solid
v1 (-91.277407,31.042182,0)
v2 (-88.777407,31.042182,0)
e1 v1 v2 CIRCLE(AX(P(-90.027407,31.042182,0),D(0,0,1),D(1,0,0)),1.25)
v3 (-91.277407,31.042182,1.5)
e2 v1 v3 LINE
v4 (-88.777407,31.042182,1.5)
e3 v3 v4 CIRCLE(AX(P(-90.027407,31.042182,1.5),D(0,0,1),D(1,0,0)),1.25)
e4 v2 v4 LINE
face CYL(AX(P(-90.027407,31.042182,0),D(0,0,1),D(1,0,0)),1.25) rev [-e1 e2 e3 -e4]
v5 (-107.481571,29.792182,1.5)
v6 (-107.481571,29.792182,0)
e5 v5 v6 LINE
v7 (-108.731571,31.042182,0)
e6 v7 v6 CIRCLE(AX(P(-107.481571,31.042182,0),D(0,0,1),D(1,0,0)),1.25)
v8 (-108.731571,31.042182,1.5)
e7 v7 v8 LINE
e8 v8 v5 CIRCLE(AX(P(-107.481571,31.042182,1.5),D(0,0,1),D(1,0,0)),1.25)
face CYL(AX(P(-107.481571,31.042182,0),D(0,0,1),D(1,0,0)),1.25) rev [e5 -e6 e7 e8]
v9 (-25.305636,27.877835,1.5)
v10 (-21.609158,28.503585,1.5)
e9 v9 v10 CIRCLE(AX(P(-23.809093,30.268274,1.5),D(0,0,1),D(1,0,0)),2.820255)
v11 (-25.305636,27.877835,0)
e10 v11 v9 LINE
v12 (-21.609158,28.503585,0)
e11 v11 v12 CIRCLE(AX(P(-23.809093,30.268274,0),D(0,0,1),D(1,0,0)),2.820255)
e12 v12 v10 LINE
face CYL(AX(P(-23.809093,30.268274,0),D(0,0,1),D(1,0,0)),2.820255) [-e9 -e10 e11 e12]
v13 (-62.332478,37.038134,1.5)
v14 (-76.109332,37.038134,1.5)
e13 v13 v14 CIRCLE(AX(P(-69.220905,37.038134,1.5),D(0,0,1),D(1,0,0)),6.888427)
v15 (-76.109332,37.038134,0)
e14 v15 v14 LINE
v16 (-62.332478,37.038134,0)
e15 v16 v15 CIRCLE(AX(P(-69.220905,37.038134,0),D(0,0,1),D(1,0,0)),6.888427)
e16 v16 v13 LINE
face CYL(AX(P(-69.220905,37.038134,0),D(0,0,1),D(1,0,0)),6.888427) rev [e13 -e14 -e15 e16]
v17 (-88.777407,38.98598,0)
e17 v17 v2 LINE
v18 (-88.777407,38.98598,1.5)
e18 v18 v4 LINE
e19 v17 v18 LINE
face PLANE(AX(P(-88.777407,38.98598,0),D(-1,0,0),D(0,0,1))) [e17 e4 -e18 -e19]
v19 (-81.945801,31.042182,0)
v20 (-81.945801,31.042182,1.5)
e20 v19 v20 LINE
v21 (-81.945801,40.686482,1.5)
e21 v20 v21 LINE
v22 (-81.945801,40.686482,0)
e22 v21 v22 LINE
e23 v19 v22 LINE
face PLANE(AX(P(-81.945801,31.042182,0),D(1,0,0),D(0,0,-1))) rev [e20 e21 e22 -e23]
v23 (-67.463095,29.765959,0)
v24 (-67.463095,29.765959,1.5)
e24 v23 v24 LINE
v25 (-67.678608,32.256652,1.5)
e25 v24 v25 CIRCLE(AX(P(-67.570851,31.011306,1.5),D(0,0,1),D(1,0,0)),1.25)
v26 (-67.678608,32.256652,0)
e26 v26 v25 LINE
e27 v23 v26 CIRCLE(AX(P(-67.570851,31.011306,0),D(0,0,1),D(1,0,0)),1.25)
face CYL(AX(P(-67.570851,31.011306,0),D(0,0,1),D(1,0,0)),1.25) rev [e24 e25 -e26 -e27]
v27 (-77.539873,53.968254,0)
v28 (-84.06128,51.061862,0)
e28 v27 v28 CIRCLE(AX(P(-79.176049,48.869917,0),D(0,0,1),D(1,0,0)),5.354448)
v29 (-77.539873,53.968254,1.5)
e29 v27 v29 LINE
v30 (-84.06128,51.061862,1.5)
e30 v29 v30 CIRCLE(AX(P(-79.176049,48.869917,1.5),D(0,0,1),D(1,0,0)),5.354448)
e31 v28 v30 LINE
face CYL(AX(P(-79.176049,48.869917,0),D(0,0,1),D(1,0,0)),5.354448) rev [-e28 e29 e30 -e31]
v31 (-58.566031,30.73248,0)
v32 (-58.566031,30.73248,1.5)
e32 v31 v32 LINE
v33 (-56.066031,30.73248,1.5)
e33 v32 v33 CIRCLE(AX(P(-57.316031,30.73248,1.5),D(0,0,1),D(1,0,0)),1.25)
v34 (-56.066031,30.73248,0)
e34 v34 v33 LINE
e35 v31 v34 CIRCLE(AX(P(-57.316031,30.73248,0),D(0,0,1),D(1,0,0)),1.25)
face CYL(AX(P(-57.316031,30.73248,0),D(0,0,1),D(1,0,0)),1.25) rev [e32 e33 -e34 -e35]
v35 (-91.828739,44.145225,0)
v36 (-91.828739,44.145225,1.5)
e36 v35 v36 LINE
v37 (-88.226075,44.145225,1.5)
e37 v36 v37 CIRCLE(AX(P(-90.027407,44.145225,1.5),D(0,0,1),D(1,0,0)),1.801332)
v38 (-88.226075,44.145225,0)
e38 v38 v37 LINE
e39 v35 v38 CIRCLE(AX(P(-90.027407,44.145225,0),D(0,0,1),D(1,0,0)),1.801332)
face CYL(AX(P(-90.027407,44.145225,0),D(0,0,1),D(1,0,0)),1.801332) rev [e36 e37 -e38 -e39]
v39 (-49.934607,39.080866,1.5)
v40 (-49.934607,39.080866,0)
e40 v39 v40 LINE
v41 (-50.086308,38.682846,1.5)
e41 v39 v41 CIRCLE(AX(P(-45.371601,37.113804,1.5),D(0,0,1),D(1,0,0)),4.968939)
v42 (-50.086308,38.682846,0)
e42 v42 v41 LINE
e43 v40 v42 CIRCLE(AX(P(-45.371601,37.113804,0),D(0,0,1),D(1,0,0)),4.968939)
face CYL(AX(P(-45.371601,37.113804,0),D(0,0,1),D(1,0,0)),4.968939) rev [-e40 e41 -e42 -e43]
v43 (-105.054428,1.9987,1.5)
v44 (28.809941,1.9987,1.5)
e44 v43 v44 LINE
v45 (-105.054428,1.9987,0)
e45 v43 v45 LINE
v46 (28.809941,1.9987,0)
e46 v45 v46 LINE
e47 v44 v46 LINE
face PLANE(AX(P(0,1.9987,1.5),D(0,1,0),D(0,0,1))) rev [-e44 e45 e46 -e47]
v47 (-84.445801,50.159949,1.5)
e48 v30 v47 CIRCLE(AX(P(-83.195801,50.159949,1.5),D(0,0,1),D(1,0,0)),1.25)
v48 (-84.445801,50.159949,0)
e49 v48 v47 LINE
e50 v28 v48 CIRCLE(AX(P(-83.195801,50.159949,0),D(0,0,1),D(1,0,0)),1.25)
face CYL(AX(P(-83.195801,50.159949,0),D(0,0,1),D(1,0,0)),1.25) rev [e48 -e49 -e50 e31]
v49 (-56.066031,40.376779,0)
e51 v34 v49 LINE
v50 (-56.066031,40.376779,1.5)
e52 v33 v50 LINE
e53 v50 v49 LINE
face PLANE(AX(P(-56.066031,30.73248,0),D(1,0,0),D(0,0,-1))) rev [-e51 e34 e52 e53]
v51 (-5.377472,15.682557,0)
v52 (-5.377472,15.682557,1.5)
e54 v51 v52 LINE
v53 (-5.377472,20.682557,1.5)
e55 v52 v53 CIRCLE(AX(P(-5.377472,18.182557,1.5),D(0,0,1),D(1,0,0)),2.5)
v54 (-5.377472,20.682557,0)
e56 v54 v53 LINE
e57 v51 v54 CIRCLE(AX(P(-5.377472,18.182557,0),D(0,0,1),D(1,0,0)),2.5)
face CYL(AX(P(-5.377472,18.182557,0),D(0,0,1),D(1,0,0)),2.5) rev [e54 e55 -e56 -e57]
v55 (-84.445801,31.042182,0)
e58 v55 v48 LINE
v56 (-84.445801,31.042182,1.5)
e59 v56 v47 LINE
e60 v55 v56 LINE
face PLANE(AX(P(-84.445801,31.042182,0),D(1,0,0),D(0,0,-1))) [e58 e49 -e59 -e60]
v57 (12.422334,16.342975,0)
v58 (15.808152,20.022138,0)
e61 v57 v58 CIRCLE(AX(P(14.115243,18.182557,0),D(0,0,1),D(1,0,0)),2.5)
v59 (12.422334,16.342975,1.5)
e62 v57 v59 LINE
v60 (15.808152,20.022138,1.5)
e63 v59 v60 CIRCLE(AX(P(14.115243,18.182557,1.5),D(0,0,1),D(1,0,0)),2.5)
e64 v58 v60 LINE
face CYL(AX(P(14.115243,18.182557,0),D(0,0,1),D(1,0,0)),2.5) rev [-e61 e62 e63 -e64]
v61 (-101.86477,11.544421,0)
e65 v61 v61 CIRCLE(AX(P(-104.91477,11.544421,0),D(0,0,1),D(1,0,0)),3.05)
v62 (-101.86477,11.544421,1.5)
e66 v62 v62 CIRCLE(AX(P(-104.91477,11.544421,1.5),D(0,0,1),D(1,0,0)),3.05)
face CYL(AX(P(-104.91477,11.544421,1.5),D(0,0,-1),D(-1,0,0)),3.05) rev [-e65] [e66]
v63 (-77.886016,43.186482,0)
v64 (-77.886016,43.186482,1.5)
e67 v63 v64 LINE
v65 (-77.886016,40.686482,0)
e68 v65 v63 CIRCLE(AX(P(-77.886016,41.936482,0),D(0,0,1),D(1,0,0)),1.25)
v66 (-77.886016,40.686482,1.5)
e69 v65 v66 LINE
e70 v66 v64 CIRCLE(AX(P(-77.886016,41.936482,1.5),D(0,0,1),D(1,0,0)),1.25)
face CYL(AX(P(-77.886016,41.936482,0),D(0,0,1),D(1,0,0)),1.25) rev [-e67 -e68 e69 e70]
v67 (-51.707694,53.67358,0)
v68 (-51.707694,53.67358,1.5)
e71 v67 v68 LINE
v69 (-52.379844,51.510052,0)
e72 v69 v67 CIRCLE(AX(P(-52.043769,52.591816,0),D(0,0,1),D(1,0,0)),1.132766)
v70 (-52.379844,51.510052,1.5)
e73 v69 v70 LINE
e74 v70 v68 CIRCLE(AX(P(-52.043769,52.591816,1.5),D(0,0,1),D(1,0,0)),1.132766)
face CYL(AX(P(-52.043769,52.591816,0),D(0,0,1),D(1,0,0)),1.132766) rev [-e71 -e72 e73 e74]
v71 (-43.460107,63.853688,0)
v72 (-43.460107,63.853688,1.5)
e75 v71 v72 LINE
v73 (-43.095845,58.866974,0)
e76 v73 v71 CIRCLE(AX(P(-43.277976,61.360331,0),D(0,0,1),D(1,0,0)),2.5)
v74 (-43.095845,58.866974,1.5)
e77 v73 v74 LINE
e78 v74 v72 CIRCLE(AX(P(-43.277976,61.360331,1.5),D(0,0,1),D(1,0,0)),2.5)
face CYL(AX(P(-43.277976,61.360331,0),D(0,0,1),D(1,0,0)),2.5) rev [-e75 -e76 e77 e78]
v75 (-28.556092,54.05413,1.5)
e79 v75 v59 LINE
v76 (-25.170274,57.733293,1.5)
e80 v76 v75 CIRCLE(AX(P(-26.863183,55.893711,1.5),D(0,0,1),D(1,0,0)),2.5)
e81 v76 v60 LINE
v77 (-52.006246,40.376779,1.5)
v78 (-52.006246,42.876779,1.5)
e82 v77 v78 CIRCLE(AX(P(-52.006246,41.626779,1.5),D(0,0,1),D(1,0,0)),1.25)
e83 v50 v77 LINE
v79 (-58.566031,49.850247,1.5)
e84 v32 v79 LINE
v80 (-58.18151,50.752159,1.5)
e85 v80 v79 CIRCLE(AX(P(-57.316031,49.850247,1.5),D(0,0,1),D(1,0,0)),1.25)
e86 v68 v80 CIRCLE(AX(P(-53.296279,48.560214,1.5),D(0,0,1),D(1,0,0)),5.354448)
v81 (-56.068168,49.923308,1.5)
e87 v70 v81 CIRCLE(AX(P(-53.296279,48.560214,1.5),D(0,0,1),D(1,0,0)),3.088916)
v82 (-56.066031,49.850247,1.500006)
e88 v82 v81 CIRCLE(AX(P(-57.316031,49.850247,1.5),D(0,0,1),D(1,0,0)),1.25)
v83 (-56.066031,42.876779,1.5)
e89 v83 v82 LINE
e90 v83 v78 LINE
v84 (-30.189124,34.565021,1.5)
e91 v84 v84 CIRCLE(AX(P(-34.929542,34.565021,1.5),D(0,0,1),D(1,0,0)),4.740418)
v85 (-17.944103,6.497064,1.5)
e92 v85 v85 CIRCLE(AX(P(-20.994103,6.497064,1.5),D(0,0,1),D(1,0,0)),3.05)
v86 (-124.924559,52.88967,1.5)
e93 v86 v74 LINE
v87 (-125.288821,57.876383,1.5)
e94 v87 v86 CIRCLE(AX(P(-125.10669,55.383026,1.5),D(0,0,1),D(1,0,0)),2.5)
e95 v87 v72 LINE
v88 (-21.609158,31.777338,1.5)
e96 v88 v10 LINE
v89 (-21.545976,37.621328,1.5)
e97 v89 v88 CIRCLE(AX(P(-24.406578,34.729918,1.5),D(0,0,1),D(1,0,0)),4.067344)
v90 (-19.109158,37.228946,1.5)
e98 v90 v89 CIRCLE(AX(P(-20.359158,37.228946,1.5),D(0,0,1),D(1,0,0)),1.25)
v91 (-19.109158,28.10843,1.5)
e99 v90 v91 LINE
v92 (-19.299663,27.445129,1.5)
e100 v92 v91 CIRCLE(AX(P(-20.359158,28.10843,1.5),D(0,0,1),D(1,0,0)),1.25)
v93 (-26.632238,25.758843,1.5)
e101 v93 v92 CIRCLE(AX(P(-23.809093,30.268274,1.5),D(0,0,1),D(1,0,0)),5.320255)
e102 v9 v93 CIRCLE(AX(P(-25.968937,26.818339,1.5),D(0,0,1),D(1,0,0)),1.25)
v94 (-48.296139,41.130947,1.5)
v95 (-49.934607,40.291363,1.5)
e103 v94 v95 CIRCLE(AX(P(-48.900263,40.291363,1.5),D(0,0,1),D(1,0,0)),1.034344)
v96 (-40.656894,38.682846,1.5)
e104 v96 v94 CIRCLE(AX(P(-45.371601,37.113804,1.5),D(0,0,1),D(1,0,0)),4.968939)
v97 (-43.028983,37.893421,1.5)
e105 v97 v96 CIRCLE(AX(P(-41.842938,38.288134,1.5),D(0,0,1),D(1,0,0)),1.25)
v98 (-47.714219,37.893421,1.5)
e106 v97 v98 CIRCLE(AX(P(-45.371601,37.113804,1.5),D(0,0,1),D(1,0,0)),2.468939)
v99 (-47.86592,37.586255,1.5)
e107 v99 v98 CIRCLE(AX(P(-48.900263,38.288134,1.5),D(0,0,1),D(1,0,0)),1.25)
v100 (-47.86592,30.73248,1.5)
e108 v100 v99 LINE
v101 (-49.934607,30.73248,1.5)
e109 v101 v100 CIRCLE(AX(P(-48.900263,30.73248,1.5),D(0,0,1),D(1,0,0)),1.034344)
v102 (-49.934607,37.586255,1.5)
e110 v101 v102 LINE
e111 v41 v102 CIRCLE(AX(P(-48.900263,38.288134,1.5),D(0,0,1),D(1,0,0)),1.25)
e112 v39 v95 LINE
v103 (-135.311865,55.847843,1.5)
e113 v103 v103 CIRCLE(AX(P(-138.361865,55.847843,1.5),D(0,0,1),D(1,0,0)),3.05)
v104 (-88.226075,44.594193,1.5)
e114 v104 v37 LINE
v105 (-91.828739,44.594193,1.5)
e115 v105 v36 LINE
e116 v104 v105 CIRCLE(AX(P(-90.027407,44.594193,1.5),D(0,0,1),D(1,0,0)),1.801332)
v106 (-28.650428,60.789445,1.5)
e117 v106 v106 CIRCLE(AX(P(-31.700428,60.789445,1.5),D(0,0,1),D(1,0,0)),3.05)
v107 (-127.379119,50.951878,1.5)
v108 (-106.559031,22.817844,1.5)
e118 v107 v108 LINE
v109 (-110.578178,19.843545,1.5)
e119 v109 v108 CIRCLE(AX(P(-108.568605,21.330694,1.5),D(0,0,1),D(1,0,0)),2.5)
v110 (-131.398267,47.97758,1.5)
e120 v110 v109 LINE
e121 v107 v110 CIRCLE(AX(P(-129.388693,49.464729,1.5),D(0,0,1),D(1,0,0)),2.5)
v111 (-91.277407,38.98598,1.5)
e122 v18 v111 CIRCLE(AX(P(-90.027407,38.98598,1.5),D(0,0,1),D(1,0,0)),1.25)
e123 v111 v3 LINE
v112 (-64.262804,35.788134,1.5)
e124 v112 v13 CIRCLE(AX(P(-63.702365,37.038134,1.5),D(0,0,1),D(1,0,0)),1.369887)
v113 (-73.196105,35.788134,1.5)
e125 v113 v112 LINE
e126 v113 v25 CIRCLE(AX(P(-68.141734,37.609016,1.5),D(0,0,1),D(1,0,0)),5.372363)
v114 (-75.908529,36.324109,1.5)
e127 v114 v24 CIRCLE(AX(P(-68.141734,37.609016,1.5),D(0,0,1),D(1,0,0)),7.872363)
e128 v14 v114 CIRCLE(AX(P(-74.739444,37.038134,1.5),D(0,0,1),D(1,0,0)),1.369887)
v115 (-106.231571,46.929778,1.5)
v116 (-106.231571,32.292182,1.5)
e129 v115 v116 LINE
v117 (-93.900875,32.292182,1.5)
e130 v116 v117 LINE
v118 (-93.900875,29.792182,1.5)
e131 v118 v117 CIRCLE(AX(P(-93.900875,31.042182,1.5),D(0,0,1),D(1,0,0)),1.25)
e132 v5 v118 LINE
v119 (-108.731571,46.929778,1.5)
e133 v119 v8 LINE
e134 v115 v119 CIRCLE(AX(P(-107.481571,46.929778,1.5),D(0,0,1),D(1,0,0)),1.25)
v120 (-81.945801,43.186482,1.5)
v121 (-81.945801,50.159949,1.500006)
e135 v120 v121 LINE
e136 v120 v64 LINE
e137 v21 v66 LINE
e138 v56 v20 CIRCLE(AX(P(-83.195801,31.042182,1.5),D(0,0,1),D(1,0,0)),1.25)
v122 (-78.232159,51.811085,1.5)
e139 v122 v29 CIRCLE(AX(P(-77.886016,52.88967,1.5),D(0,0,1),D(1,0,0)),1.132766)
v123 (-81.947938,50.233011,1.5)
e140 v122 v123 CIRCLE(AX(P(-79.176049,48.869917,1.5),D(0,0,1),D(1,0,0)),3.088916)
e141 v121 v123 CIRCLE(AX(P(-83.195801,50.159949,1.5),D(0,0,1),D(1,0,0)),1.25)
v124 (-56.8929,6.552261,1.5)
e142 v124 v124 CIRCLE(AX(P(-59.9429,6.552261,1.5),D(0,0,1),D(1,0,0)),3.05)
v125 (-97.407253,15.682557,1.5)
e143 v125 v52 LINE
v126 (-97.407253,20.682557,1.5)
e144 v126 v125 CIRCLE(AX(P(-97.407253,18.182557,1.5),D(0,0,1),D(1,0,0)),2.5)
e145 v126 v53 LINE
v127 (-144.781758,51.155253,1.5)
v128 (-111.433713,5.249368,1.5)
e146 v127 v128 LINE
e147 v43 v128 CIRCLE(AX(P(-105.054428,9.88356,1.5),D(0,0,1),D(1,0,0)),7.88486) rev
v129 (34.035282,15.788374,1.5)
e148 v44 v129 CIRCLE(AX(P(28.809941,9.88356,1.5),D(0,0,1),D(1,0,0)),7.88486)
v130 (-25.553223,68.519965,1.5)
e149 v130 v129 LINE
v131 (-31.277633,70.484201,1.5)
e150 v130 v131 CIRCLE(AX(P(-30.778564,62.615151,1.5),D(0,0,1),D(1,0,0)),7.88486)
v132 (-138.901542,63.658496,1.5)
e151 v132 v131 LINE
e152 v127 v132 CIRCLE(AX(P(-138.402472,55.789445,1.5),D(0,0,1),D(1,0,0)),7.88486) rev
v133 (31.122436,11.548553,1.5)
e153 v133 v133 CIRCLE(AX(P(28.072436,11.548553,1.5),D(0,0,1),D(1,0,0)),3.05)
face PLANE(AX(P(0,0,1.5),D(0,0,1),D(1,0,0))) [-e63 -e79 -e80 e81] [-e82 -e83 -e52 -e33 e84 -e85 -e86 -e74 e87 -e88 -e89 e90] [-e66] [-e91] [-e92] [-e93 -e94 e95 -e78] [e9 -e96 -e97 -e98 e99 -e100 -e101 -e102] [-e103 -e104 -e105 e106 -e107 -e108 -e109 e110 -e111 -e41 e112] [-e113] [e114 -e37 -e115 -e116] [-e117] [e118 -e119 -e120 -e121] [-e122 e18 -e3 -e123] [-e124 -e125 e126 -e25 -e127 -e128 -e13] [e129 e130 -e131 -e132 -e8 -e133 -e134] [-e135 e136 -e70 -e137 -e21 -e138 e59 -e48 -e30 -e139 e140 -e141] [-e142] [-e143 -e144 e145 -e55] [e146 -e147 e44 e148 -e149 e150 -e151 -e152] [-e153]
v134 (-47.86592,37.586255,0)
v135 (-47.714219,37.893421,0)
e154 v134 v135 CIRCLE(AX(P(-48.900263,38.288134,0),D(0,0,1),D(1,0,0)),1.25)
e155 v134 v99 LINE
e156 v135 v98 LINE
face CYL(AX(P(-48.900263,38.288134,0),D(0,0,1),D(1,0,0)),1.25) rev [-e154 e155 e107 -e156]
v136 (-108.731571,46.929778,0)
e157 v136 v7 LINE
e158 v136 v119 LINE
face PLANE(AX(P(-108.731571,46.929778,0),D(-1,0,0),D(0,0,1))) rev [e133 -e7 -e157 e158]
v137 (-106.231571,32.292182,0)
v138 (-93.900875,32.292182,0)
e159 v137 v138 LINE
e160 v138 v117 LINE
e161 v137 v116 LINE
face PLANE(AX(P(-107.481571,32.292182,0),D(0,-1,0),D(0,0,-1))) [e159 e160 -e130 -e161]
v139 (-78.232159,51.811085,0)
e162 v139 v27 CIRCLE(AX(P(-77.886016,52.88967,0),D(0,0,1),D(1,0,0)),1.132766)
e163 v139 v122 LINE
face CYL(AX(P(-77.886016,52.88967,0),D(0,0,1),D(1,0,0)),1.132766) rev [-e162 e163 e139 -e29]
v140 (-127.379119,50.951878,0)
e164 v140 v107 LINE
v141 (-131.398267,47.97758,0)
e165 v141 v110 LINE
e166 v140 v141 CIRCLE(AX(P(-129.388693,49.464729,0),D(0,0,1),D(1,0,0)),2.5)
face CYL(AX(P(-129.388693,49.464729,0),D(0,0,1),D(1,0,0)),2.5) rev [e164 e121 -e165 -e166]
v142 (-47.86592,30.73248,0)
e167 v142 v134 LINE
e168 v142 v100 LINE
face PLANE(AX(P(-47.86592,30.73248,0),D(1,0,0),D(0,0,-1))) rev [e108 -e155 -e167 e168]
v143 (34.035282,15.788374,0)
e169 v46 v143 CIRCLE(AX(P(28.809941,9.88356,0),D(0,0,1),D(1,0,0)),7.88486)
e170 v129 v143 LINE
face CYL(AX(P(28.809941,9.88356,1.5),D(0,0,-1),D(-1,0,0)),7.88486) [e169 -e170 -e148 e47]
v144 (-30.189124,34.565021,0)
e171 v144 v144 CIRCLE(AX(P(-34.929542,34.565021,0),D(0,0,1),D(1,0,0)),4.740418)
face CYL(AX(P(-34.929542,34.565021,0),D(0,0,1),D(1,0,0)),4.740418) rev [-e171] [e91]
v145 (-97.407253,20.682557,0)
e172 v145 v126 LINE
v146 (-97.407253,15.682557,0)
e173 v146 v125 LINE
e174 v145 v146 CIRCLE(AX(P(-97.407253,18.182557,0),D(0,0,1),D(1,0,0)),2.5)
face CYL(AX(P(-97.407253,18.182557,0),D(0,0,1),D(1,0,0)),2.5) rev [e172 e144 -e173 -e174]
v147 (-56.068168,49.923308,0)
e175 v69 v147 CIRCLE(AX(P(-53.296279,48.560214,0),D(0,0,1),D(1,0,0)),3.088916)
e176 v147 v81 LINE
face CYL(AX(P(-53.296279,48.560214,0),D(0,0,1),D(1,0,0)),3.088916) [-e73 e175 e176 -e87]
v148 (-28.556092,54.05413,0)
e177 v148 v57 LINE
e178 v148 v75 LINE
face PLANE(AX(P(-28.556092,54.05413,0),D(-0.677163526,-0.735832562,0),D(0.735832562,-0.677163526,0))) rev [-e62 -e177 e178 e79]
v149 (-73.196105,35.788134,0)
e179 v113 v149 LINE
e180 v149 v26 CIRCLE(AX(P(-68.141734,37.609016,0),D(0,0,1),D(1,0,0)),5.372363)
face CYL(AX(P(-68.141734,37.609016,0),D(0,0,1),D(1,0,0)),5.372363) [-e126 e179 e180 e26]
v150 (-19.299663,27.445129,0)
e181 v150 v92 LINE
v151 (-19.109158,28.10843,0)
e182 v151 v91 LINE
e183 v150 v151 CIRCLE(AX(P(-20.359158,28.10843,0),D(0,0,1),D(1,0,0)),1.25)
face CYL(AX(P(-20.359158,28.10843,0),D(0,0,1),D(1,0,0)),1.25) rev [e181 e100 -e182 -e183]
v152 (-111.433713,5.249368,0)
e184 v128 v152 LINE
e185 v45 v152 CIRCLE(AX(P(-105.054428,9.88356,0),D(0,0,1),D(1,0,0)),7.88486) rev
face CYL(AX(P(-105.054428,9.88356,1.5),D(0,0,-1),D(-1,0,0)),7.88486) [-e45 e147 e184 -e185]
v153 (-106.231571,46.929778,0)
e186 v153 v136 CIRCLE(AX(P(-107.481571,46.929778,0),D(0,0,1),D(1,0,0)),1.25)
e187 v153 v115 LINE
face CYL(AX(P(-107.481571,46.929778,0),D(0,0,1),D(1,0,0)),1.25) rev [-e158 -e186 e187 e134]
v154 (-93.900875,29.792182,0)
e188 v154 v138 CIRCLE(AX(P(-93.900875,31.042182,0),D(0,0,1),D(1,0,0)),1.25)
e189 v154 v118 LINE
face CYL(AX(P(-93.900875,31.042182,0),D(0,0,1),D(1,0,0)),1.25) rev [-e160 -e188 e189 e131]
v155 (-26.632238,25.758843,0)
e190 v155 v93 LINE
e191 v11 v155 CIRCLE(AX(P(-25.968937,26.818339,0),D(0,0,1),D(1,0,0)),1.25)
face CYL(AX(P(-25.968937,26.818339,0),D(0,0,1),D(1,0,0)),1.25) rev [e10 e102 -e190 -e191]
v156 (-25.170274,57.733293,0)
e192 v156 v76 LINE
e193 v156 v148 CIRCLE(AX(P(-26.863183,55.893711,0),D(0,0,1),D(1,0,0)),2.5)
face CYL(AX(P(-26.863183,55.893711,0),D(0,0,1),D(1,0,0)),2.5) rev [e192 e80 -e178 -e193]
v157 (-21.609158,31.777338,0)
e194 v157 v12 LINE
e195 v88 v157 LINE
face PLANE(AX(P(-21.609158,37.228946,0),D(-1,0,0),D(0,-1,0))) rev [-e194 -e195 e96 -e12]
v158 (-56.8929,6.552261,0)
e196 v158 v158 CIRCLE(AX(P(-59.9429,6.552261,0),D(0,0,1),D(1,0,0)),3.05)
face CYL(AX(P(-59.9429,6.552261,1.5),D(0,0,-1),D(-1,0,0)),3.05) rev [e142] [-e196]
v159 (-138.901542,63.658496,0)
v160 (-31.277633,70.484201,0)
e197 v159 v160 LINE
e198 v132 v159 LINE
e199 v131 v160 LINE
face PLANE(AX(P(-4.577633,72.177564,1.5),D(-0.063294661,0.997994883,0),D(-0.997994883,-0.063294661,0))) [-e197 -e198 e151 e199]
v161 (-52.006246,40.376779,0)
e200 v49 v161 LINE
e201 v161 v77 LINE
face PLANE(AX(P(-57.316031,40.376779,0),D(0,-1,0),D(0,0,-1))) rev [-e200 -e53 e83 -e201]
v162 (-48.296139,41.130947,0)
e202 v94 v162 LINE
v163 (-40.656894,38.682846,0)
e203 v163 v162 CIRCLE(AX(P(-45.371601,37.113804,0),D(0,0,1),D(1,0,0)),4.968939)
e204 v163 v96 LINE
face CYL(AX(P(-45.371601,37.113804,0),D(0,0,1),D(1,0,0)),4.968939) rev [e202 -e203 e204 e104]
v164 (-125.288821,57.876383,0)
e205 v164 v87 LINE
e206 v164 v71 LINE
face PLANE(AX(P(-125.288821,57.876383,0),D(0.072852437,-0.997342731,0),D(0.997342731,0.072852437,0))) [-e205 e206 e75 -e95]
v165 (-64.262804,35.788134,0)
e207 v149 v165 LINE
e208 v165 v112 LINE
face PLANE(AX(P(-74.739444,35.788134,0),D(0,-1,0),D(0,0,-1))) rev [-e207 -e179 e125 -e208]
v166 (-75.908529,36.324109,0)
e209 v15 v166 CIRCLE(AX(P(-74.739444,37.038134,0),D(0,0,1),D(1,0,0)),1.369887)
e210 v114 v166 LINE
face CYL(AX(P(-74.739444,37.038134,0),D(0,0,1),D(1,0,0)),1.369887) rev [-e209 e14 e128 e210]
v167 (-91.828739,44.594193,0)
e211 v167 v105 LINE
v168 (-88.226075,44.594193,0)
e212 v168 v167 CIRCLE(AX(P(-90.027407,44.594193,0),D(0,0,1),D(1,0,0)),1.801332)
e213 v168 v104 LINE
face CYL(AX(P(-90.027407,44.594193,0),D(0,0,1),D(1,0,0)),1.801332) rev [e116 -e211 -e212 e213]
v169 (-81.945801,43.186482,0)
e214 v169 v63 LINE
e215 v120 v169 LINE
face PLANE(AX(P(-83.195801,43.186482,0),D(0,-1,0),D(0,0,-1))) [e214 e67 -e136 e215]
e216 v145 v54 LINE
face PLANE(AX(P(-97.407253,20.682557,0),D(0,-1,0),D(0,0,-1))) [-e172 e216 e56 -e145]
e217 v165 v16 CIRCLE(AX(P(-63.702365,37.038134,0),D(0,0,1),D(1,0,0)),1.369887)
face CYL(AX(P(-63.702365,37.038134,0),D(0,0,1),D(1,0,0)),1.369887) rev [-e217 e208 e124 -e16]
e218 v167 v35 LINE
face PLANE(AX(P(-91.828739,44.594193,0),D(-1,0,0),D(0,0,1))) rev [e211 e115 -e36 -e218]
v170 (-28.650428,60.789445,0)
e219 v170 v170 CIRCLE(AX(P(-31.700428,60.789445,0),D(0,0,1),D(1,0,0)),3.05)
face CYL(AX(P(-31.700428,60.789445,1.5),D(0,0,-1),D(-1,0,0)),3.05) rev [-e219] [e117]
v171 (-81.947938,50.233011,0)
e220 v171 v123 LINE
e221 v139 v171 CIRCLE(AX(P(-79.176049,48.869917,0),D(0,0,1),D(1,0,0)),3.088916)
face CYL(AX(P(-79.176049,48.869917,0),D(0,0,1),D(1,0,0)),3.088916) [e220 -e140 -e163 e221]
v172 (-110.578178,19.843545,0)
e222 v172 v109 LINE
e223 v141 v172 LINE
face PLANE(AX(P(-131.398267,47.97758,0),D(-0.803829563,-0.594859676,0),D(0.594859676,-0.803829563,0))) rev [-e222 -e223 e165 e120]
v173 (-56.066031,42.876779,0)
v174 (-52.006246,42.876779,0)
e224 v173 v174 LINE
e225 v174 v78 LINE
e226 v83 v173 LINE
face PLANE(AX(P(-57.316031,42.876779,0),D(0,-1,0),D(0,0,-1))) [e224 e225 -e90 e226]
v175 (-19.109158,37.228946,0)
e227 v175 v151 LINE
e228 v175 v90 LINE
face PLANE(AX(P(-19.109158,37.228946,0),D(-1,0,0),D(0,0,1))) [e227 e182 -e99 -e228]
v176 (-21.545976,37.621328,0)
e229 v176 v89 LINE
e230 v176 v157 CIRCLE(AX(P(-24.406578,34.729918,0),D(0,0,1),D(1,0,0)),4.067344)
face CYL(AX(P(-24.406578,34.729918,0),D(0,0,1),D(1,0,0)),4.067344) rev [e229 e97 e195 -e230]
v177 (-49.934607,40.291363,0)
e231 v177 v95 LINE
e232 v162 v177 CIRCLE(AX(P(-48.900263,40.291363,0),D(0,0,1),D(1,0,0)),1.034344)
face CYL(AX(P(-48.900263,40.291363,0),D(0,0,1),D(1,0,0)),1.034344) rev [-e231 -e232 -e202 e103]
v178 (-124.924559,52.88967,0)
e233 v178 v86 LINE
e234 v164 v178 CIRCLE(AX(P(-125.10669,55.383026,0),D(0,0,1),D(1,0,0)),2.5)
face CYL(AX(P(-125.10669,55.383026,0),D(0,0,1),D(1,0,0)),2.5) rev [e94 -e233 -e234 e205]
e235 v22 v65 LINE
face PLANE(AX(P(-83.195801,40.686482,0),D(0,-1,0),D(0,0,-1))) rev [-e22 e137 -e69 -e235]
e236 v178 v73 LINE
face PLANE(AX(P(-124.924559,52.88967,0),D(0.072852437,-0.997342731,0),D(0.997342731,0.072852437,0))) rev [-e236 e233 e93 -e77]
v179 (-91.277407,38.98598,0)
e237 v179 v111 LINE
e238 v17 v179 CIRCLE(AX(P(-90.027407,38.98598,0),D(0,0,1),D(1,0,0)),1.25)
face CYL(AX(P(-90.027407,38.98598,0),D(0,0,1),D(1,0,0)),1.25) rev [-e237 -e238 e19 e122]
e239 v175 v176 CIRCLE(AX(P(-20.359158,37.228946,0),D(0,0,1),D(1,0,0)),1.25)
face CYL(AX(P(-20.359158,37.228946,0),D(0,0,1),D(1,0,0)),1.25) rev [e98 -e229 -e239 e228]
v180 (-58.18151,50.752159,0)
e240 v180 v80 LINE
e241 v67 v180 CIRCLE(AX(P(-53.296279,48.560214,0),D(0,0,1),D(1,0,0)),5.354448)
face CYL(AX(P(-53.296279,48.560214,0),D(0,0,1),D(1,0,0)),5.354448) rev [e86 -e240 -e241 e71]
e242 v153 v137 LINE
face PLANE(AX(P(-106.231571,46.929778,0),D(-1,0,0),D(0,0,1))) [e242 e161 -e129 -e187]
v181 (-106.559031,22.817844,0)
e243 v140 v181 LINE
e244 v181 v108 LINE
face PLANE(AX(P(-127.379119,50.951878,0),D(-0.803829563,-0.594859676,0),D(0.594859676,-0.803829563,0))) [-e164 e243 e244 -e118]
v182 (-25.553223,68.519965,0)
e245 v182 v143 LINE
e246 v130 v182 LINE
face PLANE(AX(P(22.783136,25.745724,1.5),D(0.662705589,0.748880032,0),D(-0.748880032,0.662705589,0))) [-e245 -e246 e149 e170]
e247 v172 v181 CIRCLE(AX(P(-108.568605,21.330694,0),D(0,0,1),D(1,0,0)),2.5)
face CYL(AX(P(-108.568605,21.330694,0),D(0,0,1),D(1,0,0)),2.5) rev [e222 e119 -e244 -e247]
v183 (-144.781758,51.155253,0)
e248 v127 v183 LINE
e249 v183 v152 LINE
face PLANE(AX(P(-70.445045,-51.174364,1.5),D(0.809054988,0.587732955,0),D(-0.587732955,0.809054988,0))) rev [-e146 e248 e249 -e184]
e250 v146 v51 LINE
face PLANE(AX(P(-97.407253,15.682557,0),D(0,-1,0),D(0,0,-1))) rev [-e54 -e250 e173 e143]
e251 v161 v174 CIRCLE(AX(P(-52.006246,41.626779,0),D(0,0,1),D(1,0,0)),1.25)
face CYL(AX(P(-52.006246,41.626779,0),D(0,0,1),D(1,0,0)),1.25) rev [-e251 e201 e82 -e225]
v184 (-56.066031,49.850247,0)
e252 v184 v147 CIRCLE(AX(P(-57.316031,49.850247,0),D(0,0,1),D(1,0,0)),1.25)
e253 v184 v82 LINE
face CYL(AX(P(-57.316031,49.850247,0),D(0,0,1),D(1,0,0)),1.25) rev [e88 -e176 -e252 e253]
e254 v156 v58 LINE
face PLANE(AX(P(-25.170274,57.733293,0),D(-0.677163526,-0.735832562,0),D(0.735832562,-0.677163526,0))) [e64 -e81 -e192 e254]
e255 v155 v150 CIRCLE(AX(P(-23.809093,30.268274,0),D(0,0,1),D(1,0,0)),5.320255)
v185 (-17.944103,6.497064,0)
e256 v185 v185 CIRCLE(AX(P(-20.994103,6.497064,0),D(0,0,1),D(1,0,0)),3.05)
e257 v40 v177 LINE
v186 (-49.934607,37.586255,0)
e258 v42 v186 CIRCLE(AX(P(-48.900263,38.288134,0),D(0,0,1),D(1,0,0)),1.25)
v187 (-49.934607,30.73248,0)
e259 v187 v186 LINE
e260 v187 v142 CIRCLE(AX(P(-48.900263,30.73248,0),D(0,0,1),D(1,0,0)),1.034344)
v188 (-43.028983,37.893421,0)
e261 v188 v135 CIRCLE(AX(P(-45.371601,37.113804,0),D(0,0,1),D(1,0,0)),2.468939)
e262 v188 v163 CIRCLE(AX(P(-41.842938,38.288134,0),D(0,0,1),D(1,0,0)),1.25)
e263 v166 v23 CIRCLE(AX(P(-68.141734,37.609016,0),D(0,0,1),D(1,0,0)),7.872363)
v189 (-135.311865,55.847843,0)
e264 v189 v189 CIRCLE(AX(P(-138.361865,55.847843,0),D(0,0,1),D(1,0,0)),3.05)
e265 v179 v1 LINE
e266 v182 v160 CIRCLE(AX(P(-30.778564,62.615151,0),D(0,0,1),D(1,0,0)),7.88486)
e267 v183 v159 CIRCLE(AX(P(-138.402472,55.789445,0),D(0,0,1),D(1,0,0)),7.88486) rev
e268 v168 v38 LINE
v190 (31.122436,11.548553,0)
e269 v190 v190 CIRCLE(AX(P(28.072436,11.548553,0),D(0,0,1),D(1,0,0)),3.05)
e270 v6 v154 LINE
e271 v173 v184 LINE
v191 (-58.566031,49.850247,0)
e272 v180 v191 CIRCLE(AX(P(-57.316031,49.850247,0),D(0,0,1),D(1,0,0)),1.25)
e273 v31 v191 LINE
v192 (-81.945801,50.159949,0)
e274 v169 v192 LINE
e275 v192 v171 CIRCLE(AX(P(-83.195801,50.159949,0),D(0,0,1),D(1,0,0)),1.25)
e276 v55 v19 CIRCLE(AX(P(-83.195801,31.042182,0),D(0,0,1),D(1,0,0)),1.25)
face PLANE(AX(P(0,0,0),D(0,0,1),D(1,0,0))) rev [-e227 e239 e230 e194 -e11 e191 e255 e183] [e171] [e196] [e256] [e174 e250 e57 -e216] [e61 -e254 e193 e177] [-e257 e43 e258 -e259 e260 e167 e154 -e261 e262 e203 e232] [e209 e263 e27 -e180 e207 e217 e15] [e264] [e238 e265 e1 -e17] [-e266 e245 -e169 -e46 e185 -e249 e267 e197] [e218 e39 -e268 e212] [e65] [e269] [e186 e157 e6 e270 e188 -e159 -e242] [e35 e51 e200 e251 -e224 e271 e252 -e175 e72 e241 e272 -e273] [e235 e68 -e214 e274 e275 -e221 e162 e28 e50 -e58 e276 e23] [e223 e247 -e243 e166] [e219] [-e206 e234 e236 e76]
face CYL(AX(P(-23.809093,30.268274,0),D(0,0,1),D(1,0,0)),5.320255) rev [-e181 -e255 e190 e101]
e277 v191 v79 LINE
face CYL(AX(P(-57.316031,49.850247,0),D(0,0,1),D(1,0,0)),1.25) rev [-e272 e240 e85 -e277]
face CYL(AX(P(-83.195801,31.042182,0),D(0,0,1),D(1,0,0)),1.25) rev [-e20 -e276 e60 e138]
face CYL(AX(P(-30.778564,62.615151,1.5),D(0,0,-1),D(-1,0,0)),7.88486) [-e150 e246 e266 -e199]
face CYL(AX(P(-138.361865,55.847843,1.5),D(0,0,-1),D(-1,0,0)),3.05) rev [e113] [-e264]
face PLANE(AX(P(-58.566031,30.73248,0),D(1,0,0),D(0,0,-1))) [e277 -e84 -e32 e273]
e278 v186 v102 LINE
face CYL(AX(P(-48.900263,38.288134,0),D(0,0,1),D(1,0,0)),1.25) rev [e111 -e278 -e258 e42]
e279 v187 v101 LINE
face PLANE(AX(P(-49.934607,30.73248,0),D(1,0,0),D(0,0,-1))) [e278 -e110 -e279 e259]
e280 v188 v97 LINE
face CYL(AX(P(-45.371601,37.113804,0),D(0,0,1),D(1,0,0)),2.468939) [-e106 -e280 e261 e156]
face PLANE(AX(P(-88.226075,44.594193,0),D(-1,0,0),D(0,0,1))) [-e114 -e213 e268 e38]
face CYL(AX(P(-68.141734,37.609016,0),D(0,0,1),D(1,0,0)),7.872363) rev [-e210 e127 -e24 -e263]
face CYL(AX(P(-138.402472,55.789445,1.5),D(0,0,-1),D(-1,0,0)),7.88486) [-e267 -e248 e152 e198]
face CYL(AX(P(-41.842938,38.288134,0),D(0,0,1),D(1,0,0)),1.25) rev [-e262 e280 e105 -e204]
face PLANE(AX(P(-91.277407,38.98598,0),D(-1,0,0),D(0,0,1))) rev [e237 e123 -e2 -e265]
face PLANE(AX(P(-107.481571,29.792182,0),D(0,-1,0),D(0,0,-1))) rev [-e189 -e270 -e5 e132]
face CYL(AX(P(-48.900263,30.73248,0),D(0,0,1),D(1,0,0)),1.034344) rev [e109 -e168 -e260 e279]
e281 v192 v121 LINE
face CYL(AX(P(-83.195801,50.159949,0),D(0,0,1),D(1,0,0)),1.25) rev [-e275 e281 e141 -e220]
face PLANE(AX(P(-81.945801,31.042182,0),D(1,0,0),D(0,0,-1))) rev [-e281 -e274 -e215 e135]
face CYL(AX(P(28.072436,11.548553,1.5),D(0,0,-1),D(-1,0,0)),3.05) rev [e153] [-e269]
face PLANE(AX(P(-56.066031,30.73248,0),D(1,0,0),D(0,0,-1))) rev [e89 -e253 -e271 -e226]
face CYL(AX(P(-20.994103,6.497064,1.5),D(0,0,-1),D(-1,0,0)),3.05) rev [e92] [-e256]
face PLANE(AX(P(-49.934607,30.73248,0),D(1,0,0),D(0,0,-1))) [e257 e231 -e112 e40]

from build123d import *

# Parameters (mm, degrees)
SKETCH3_R              = 3.05
BOSS_EXTRUDE2_DEPTH    = 1.5
CUT_EXTRUDE6_START     = -1.5
CUT_EXTRUDE6_OUTLINE_R = 4.740417633
CUT_EXTRUDE6_DEPTH     = 1.5
SKETCH5_W              = 8.82084455
SKETCH5_H              = 4.027479235
CUT_EXTRUDE7_DEPTH     = 10


# Read off the part's stored shape, not the designer's step: Cut-Extrude6
with BuildPart() as part:
    # Sketch3 → Boss-Extrude2 (new body)
    with BuildSketch(Plane.XY):
        with BuildLine():
            ThreePointArc((-144.781757924, 51.155253196), (-145.537646541, 59.145084312), (-138.901541854, 63.658495821))
            Line((-138.901541854, 63.658495821), (-31.27763344, 70.484200927))
            ThreePointArc((-31.27763344, 70.484200927), (-28.219469087, 70.073170265), (-25.553222822, 68.519965104))
            Line((-25.553222822, 68.519965104), (34.035282129, 15.788374442))
            ThreePointArc((34.035282129, 15.788374442), (36.183192103, 7.089603476), (28.809941074, 1.998699544))
            Line((28.809941074, 1.998699544), (-105.054427768, 1.998699544))
            ThreePointArc((-105.054427768, 1.998699544), (-108.634306546, 2.858213585), (-111.433713401, 5.24936764))
            Line((-111.433713401, 5.24936764), (-144.781757924, 51.155253196))
        make_face()
        with Locations((-138.361865478, 55.847842692)):
            Circle(SKETCH3_R, mode=Mode.SUBTRACT)
        with Locations((-31.700427911, 60.789445495)):
            Circle(SKETCH3_R, mode=Mode.SUBTRACT)
        with Locations((28.072435844, 11.548553432)):
            Circle(SKETCH3_R, mode=Mode.SUBTRACT)
        with Locations((-20.994102553, 6.497064076)):
            Circle(SKETCH3_R, mode=Mode.SUBTRACT)
        with Locations((-104.914769783, 11.544420828)):
            Circle(SKETCH3_R, mode=Mode.SUBTRACT)
        with Locations((-59.942900407, 6.552260768)):
            Circle(SKETCH3_R, mode=Mode.SUBTRACT)
    extrude(amount=BOSS_EXTRUDE2_DEPTH)

    # Cut-Extrude6 outline → Cut-Extrude6 (cut)
    # profile 1 of 13: a face of its own
    with BuildSketch(Plane.XY.offset(1.5).offset(CUT_EXTRUDE6_START)):
        with BuildLine():
            Line((-84.445801199, 50.15994926), (-84.445801199, 31.042182393))
            ThreePointArc((-84.445801199, 31.042182393), (-83.195801199, 29.792182393), (-81.945801199, 31.042182393))
            Line((-81.945801199, 31.042182393), (-81.945801199, 40.686482216))
            Line((-81.945801199, 40.686482216), (-77.88601609, 40.686482216))
            ThreePointArc((-77.88601609, 40.686482216), (-76.63601609, 41.936482216), (-77.88601609, 43.186482216))
            Line((-77.88601609, 43.186482216), (-81.945801199, 43.186482216))
            Line((-81.945801199, 43.186482216), (-81.945801199, 50.15994926))
            ThreePointArc((-81.945801199, 50.15994926), (-81.946335576, 50.196495881), (-81.947938248, 50.233011255))
            ThreePointArc((-81.947938248, 50.233011255), (-80.383515088, 51.713053047), (-78.232158953, 51.811085227))
            ThreePointArc((-78.232158953, 51.811085227), (-76.807431812, 52.543526642), (-77.539873228, 53.968253783))
            ThreePointArc((-77.539873228, 53.968253783), (-81.355697491, 53.760646802), (-84.061279898, 51.061862018))
            ThreePointArc((-84.061279898, 51.061862018), (-84.345659533, 50.650179628), (-84.445801199, 50.15994926))
        make_face()
    # profile 2 of 13: a face of its own
    with BuildSketch(Plane.XY.offset(1.5).offset(CUT_EXTRUDE6_START)):
        with BuildLine():
            ThreePointArc((-62.332478211, 37.038133865), (-69.220904983, 43.926560636), (-76.109331754, 37.038133865))
            ThreePointArc((-76.109331754, 37.038133865), (-76.058176003, 36.667272281), (-75.908529373, 36.324108893))
            ThreePointArc((-75.908529373, 36.324108893), (-72.970069284, 31.391197022), (-67.463094766, 29.765958923))
            ThreePointArc((-67.463094766, 29.765958923), (-66.325504582, 31.119062235), (-67.678607894, 32.256652419))
            ThreePointArc((-67.678607894, 32.256652419), (-71.037890657, 33.084133952), (-73.196105391, 35.788133865))
            Line((-73.196105391, 35.788133865), (-64.262803866, 35.788133865))
            ThreePointArc((-64.262803866, 35.788133865), (-62.957767021, 35.888279837), (-62.332478211, 37.038133865))
        make_face()
        with BuildLine():
            Line((-65.265046653, 38.288133865), (-73.176763311, 38.288133865))
            ThreePointArc((-73.176763311, 38.288133865), (-69.220904982, 41.18678607), (-65.265046653, 38.288133865))
        make_face(mode=Mode.SUBTRACT)
    # profile 3 of 13: a face of its own
    with BuildSketch(Plane.XY.offset(1.5).offset(CUT_EXTRUDE6_START)):
        with BuildLine():
            Line((-88.226075166, 44.145224769), (-88.226075166, 44.594193262))
            ThreePointArc((-88.226075166, 44.594193262), (-90.027407115, 46.395525211), (-91.828739063, 44.594193262))
            Line((-91.828739063, 44.594193262), (-91.828739063, 44.145224769))
            ThreePointArc((-91.828739063, 44.145224769), (-90.027407115, 42.343892821), (-88.226075166, 44.145224769))
        make_face()
    # profile 4 of 13: a face of its own
    with BuildSketch(Plane.XY.offset(1.5).offset(CUT_EXTRUDE6_START)):
        with BuildLine():
            Line((-91.277407114, 38.985980077), (-91.277407114, 31.042182393))
            ThreePointArc((-91.277407114, 31.042182393), (-90.027407114, 29.792182393), (-88.777407114, 31.042182393))
            Line((-88.777407114, 31.042182393), (-88.777407114, 38.985980077))
            ThreePointArc((-88.777407114, 38.985980077), (-90.027407114, 40.235980077), (-91.277407114, 38.985980077))
        make_face()
    # profile 5 of 13: a face of its own
    with BuildSketch(Plane.XY.offset(1.5).offset(CUT_EXTRUDE6_START)):
        with BuildLine():
            Line((-108.731571495, 46.929777762), (-108.731571495, 31.042182393))
            ThreePointArc((-108.731571495, 31.042182393), (-108.365454972, 30.158298916), (-107.481571495, 29.792182393))
            Line((-107.481571495, 29.792182393), (-93.900874788, 29.792182393))
            ThreePointArc((-93.900874788, 29.792182393), (-92.650874788, 31.042182393), (-93.900874788, 32.292182393))
            Line((-93.900874788, 32.292182393), (-106.231571495, 32.292182393))
            Line((-106.231571495, 32.292182393), (-106.231571495, 46.929777762))
            ThreePointArc((-106.231571495, 46.929777762), (-107.481571495, 48.179777762), (-108.731571495, 46.929777762))
        make_face()
    # profile 6 of 13: a face of its own
    with BuildSketch(Plane.XY.offset(1.5).offset(CUT_EXTRUDE6_START)):
        with BuildLine():
            Line((15.808152073, 20.022138003), (-25.170273903, 57.733292534))
            ThreePointArc((-25.170273903, 57.733292534), (-28.702764122, 57.586619945), (-28.556091534, 54.054129726))
            Line((-28.556091534, 54.054129726), (12.422334441, 16.342975195))
            ThreePointArc((12.422334441, 16.342975195), (15.954824661, 16.489647783), (15.808152073, 20.022138003))
        make_face()
    # profile 7 of 13: a face of its own
    with BuildSketch(Plane.XY.offset(1.5).offset(CUT_EXTRUDE6_START)):
        with Locations((-34.929541807, 34.565020639)):
            Circle(CUT_EXTRUDE6_OUTLINE_R)
    # profile 8 of 13: a face of its own
    with BuildSketch(Plane.XY.offset(1.5).offset(CUT_EXTRUDE6_START)):
        with BuildLine():
            Line((-49.934606866, 40.291363071), (-49.934606866, 39.080866379))
            ThreePointArc((-49.934606866, 39.080866379), (-50.014724328, 38.883482639), (-50.086308054, 38.682846354))
            ThreePointArc((-50.086308054, 38.682846354), (-50.138471301, 38.116841548), (-49.934606866, 37.586255327))
            Line((-49.934606866, 37.586255327), (-49.934606866, 30.732479638))
            ThreePointArc((-49.934606866, 30.732479638), (-48.900263345, 29.698136117), (-47.865919824, 30.732479638))
            Line((-47.865919824, 30.732479638), (-47.865919824, 37.586255327))
            ThreePointArc((-47.865919824, 37.586255327), (-47.779496323, 37.734616672), (-47.714218637, 37.893421375))
            ThreePointArc((-47.714218637, 37.893421375), (-45.371600863, 39.582743631), (-43.02898309, 37.893421375))
            ThreePointArc((-43.02898309, 37.893421375), (-41.448225892, 37.102089156), (-40.656893673, 38.682846354))
            ThreePointArc((-40.656893673, 38.682846354), (-43.855198918, 41.845704884), (-48.296139271, 41.130946672))
            ThreePointArc((-48.296139271, 41.130946672), (-49.371959591, 41.211889644), (-49.934606866, 40.291363071))
        make_face()
    # profile 9 of 13: a face of its own
    with BuildSketch(Plane.XY.offset(1.5).offset(CUT_EXTRUDE6_START)):
        with BuildLine():
            Line((-5.377471622, 20.682556599), (-97.407252706, 20.682556599))
            ThreePointArc((-97.407252706, 20.682556599), (-99.907252706, 18.182556599), (-97.407252706, 15.682556599))
            Line((-97.407252706, 15.682556599), (-5.377471622, 15.682556599))
            ThreePointArc((-5.377471622, 15.682556599), (-2.877471622, 18.182556599), (-5.377471622, 20.682556599))
        make_face()
    # profile 10 of 13: a face of its own
    with BuildSketch(Plane.XY.offset(1.5).offset(CUT_EXTRUDE6_START)):
        with BuildLine():
            Line((-58.566031267, 49.850246505), (-58.566031267, 30.732479638))
            ThreePointArc((-58.566031267, 30.732479638), (-57.316031267, 29.482479638), (-56.066031267, 30.732479638))
            Line((-56.066031267, 30.732479638), (-56.066031267, 40.376779461))
            Line((-56.066031267, 40.376779461), (-52.006246159, 40.376779461))
            ThreePointArc((-52.006246159, 40.376779461), (-50.756246159, 41.626779461), (-52.006246159, 42.876779461))
            Line((-52.006246159, 42.876779461), (-56.066031267, 42.876779461))
            Line((-56.066031267, 42.876779461), (-56.066031267, 49.850246505))
            ThreePointArc((-56.066031267, 49.850246505), (-56.066565644, 49.886793126), (-56.068168316, 49.923308499))
            ThreePointArc((-56.068168316, 49.923308499), (-54.516982153, 51.397692157), (-52.379843678, 51.510052394))
            ThreePointArc((-52.379843678, 51.510052394), (-50.962005268, 52.255741402), (-51.707694277, 53.673579812))
            ThreePointArc((-51.707694277, 53.673579812), (-55.498696573, 53.440732932), (-58.181509966, 50.752159263))
            ThreePointArc((-58.181509966, 50.752159263), (-58.465889601, 50.340476873), (-58.566031267, 49.850246505))
        make_face()
    # profile 11 of 13: a face of its own
    with BuildSketch(Plane.XY.offset(1.5).offset(CUT_EXTRUDE6_START)):
        with BuildLine():
            ThreePointArc((-19.109158417, 37.228945948), (-20.160440416, 38.463049329), (-21.545976267, 37.62132764))
            ThreePointArc((-21.545976267, 37.62132764), (-28.473684687, 34.773889825), (-21.609158417, 31.777337614))
            Line((-21.609158417, 31.777337614), (-21.609158417, 28.503585324))
            ThreePointArc((-21.609158417, 28.503585324), (-23.338369309, 27.48758), (-25.305636032, 27.877834744))
            ThreePointArc((-25.305636032, 27.877834744), (-27.028433091, 27.481639975), (-26.632238322, 25.758842916))
            ThreePointArc((-26.632238322, 25.758842916), (-22.616709193, 25.083359631), (-19.299662504, 27.445128696))
            ThreePointArc((-19.299662504, 27.445128696), (-19.157728042, 27.763371797), (-19.109158417, 28.108429841))
            Line((-19.109158417, 28.108429841), (-19.109158417, 37.228945948))
        make_face()
    # profile 12 of 13: a face of its own
    with BuildSketch(Plane.XY.offset(1.5).offset(CUT_EXTRUDE6_START)):
        with BuildLine():
            Line((-106.559030622, 22.817843613), (-127.379119271, 50.951878316))
            ThreePointArc((-127.379119271, 50.951878316), (-130.875842368, 51.474303034), (-131.398267085, 47.977579937))
            Line((-131.398267085, 47.977579937), (-110.578178436, 19.843545235))
            ThreePointArc((-110.578178436, 19.843545235), (-107.08145534, 19.321120517), (-106.559030622, 22.817843613))
        make_face()
    # profile 13 of 13: a face of its own
    with BuildSketch(Plane.XY.offset(1.5).offset(CUT_EXTRUDE6_START)):
        with BuildLine():
            Line((-43.460107465, 63.853687658), (-125.288821414, 57.876383158))
            ThreePointArc((-125.288821414, 57.876383158), (-127.600047149, 55.20089524), (-124.924559231, 52.889669505))
            Line((-124.924559231, 52.889669505), (-43.095845282, 58.866974005))
            ThreePointArc((-43.095845282, 58.866974005), (-40.784619546, 61.542461923), (-43.460107465, 63.853687658))
        make_face()
    extrude(amount=CUT_EXTRUDE6_DEPTH, mode=Mode.SUBTRACT)

    # Sketch5 → Cut-Extrude7 (cut)
    with BuildSketch(Plane.XY.offset(1.5)):
        with Locations((-69.045310367, 39.34406946)):
            Rectangle(SKETCH5_W, SKETCH5_H)
    extrude(amount=-CUT_EXTRUDE7_DEPTH, mode=Mode.SUBTRACT)


solid = part.part
